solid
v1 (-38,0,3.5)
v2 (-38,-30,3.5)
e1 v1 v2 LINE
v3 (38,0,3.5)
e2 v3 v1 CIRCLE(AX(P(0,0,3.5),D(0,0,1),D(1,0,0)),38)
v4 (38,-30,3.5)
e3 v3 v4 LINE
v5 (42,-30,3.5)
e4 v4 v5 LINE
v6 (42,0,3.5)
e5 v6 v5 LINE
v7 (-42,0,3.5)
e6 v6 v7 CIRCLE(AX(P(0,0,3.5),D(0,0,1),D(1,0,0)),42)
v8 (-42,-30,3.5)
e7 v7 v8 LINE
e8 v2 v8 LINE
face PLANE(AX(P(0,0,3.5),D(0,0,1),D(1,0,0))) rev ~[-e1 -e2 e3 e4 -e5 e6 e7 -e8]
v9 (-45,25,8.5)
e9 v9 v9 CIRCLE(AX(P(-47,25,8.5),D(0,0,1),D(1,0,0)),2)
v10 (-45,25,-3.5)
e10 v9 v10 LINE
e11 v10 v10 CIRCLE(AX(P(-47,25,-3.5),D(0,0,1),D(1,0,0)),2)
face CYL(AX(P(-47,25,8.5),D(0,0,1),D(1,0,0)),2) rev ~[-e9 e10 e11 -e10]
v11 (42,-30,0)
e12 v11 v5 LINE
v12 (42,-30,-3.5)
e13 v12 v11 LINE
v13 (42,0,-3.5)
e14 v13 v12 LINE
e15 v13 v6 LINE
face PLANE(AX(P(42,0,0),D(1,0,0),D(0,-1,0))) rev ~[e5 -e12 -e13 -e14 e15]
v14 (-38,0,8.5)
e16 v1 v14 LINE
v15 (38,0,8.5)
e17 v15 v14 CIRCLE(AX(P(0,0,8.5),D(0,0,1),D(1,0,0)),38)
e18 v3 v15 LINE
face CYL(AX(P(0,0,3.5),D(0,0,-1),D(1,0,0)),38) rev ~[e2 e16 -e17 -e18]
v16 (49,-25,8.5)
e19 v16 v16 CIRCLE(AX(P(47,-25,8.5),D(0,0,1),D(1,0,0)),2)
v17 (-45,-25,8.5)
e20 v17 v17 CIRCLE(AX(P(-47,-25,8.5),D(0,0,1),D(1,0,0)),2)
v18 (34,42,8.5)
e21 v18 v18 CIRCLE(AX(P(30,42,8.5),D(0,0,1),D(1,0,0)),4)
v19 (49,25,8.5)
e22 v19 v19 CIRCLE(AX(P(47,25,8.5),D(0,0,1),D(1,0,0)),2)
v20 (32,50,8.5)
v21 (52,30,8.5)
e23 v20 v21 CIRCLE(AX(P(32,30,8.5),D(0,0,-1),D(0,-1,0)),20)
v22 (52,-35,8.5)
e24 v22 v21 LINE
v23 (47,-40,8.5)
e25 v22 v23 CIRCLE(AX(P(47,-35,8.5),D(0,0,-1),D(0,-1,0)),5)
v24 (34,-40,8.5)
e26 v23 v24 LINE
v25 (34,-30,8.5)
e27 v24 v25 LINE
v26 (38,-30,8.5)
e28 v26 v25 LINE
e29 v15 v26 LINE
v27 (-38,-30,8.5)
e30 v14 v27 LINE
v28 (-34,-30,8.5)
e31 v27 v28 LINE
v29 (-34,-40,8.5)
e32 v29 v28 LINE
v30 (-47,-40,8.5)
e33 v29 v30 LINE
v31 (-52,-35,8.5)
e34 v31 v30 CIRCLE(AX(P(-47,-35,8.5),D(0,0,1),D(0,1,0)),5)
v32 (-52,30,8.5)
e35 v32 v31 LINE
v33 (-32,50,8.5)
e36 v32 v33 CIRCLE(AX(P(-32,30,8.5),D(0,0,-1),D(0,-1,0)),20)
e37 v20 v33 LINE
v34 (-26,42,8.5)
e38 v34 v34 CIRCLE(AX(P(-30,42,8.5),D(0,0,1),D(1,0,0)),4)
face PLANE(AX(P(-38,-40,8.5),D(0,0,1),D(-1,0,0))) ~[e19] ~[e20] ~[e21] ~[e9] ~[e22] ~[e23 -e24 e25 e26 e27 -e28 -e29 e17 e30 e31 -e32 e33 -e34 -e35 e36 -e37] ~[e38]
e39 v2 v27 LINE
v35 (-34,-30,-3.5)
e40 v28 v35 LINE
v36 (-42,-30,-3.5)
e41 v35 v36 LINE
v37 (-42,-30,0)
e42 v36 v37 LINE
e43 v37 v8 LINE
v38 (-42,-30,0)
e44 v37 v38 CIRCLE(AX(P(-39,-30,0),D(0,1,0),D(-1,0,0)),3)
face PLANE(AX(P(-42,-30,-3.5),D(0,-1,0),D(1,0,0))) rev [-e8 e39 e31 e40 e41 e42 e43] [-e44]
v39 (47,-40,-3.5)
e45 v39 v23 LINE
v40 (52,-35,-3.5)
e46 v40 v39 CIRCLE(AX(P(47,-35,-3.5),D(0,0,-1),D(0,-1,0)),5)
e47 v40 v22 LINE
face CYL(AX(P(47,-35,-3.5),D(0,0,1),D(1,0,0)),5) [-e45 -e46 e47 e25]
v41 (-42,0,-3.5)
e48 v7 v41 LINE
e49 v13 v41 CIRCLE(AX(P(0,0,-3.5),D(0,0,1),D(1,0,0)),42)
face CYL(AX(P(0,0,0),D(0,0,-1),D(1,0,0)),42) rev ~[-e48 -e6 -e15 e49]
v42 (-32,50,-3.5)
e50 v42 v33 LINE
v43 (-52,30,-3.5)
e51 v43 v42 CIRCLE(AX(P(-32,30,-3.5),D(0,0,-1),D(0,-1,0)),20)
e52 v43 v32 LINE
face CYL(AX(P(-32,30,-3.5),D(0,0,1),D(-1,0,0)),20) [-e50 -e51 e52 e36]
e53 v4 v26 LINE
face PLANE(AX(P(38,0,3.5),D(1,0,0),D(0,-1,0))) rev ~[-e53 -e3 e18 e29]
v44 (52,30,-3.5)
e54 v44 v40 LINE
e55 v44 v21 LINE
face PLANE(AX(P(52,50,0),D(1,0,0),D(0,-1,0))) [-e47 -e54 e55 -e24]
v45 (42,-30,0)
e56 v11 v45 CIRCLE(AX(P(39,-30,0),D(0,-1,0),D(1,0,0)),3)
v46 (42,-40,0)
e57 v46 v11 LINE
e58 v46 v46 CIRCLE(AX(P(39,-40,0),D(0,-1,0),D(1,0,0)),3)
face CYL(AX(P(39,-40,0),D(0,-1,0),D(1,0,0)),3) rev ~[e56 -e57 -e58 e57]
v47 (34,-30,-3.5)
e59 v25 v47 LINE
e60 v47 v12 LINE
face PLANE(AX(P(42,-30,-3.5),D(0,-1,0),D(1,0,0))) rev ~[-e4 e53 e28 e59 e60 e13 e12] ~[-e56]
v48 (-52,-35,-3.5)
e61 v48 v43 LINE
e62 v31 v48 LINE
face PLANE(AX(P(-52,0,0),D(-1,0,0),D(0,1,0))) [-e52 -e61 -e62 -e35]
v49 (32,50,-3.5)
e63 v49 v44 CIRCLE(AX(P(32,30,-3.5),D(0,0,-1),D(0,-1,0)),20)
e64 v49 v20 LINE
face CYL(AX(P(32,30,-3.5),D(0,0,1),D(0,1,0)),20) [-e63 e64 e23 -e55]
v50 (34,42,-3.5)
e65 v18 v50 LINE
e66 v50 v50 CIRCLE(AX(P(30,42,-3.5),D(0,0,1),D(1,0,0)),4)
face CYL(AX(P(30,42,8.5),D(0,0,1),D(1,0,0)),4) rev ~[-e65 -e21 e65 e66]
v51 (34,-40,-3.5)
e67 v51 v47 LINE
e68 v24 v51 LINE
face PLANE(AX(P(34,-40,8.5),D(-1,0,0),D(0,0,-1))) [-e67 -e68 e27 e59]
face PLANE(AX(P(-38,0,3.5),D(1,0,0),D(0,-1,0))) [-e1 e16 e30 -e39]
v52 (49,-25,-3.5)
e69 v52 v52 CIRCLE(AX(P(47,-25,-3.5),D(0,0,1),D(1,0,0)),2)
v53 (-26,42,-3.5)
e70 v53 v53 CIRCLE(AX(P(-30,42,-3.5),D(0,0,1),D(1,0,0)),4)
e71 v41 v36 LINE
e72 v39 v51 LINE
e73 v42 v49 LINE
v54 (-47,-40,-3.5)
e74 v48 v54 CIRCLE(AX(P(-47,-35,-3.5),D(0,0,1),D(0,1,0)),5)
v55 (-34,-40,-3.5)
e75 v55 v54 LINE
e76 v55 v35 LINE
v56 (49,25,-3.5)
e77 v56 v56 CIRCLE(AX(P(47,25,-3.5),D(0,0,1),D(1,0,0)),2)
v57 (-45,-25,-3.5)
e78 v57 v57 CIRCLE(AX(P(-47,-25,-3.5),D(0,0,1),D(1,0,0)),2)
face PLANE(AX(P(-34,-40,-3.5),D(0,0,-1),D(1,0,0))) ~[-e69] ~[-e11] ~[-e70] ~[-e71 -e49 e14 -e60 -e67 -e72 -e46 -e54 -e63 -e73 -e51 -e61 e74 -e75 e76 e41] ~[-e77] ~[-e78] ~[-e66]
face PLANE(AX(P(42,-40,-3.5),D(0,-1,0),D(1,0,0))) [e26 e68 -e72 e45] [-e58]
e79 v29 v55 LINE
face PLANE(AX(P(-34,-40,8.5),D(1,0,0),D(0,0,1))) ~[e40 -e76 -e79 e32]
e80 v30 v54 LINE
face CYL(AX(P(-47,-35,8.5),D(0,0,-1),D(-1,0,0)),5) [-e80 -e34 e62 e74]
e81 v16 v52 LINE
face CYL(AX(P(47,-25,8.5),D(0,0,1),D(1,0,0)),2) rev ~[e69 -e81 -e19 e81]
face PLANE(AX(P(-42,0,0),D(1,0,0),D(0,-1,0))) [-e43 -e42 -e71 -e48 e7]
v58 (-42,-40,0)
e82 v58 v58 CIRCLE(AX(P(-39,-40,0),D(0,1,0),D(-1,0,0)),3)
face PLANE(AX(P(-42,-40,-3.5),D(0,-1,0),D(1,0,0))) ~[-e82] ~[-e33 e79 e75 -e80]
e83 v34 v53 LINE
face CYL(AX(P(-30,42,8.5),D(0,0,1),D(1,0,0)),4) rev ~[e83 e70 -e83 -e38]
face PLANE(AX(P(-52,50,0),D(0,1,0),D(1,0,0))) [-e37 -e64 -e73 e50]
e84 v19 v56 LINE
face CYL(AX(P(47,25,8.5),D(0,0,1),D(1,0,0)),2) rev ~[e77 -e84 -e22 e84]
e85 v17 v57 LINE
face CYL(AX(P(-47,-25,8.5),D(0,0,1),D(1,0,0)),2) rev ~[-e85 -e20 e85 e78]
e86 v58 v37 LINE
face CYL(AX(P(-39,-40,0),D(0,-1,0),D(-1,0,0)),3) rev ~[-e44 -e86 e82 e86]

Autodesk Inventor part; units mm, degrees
ref_plane "YZ Plane" through (0, 0, 0) normal (1, 0, 0) x (0, 1, 0)
ref_plane "XZ Plane" through (0, 0, 0) normal (0, 1, 0) x (-1, 0, 0)
ref_plane "XY Plane" through (0, 0, 0) normal (0, 0, 1) x (1, 0, 0)
sketch "Sketch1" plane through (0, 0, 0) normal (0, 0, 1) x (1, 0, 0)
  circle A0 centre (0, 0) radius 4
  circle A1 centre (0, 0) radius 40 construction
  circle A2 centre (0, 0) radius 42 construction
  arc A3 (42, 0) -> (-42, 0) centre (0, 0) ccw
  line L0 (-42, 0) -> (-52, 0)
  line L1 (-52, 0) -> (-52, 50)
  line L2 (-52, 50) -> (52, 50)
  line L3 (52, 50) -> (52, 0)
  line L4 (52, 0) -> (42, 0)
  line L5 (-52, 0) -> (-42, 0)
  line L6 (-42, 0) -> (-42, -40)
  line L7 (-42, -40) -> (-52, -40)
  line L8 (-52, -40) -> (-52, 0)
  line L9 (52, 0) -> (42, 0)
  line L10 (42, 0) -> (42, -40)
  line L11 (42, -40) -> (52, -40)
  line L12 (52, -40) -> (52, 0)
  dimension "d0" = 8
  dimension "d1" = 80
  dimension "d2" = 2
  dimension "d3" = 50
  dimension "d4" = 10
  dimension "d5" = 40
extrude "Extrusion1" add sketch "Sketch1" along normal mid plane 7 contours A3 L0 L1 L2 L3 L4 | L4 L12 L11 L10 | L6 L7 L8 L0
sketch "Sketch2" plane through (0, 0, 3.5) normal (0, 0, 1) x (1, 0, 0)
  line L0 (42, 0) -> (42, -40) projected
  line L1 (42, -40) -> (52, -40) projected
  line L2 (52, -40) -> (52, 50) projected
  line L3 (52, 50) -> (-52, 50) projected
  line L4 (-52, 50) -> (-52, -40) projected
  line L5 (-52, -40) -> (-42, -40) projected
  line L6 (-42, -40) -> (-42, 0) projected
  arc A0 (42, 0) -> (-42, 0) centre (0, 0) ccw projected
  arc A1 (38, 0) -> (-38, 0) centre (0, 0) ccw
  line L7 (-38, 0) -> (-38, -40)
  line L8 (-38, -40) -> (-42, -40)
  line L9 (38, 0) -> (38, -40)
  line L10 (42, -40) -> (52, -40) projected
  line L11 (38, -40) -> (42, -40)
  dimension "d11" = 76
extrude "Extrusion2" add sketch "Sketch2" along normal blind 5
sketch "Sketch3" plane through (0, 0, 8.5) normal (0, 0, 1) x (1, 0, 0)
  line L0 (47, -25) -> (-47, -25) construction
  line L1 (-47, -25) -> (-47, 25) construction
  line L2 (-47, 25) -> (47, 25) construction
  line L3 (47, 25) -> (47, -25) construction
  line L4 (47, -25) -> (-47, 25) construction
  line L5 (-47, -25) -> (47, 25) construction
  arc A0 (42, 0) -> (-42, 0) centre (0, 0) ccw construction
  line L6 (-42, -40) -> (-42, 0) construction
  line L7 (42, 0) -> (42, -40) construction
  circle A1 centre (-47, 25) radius 2
  circle A2 centre (-47, -25) radius 2
  circle A3 centre (47, -25) radius 2
  circle A4 centre (47, 25) radius 2
  dimension "d12" = 4
  dimension "d13" = 5
  dimension "d14" = 50
extrude "Extrusion3" cut sketch "Sketch3" against normal through all
sketch "Sketch4" plane through (0, 0, 8.5) normal (0, 0, 1) x (1, 0, 0)
  circle A0 centre (-30, 42) radius 4 projected
  circle A1 centre (30, 42) radius 4 projected
  point P0 (0, 0)
extrude "Extrusion4" cut sketch "Sketch4" against normal through all
sketch "Sketch5" plane through (42, -40, -3.5) normal (0, -1, 0) x (1, 0, 0)
  line L0 (10, 0) -> (10, 12) construction
  line L1 (-4, 12) -> (10, 12) construction
  line L2 (-4, 7) -> (-4, 12) projected
  line L3 (-4, 7) -> (0, 7) projected
  line L4 (0, 0) -> (0, 7) projected
  line L5 (10, 0) -> (0, 0) construction
  line L6 (0, 0) -> (0, 7) construction
  line L7 (0, 3.5) -> (-3, 3.5) construction
  circle A0 centre (-3, 3.5) radius 3
  line L8 (-4, 12) -> (-8, 12)
  line L9 (-80, 12) -> (-4, 12) projected
  line L10 (-8, 12) -> (-8, 0)
  line L11 (-8, 0) -> (0, 0)
  point P0 (-42, 3.5)
  dimension "d19" = 6
  dimension "d20" = 4
extrude "Extrusion5" add sketch "Sketch5" against normal blind 10
mirror "Mirror1" about plane through (0, 0, 0) normal (1, 0, 0) of "Extrusion5"
fillet "Fillet1" radius 20 2 edges at (52, 50, 2.5) (-52, 50, 2.5)
fillet "Fillet2" radius 5 2 edges at (52, -40, 2.5) (-52, -40, 2.5)
properties part number "frame top"
